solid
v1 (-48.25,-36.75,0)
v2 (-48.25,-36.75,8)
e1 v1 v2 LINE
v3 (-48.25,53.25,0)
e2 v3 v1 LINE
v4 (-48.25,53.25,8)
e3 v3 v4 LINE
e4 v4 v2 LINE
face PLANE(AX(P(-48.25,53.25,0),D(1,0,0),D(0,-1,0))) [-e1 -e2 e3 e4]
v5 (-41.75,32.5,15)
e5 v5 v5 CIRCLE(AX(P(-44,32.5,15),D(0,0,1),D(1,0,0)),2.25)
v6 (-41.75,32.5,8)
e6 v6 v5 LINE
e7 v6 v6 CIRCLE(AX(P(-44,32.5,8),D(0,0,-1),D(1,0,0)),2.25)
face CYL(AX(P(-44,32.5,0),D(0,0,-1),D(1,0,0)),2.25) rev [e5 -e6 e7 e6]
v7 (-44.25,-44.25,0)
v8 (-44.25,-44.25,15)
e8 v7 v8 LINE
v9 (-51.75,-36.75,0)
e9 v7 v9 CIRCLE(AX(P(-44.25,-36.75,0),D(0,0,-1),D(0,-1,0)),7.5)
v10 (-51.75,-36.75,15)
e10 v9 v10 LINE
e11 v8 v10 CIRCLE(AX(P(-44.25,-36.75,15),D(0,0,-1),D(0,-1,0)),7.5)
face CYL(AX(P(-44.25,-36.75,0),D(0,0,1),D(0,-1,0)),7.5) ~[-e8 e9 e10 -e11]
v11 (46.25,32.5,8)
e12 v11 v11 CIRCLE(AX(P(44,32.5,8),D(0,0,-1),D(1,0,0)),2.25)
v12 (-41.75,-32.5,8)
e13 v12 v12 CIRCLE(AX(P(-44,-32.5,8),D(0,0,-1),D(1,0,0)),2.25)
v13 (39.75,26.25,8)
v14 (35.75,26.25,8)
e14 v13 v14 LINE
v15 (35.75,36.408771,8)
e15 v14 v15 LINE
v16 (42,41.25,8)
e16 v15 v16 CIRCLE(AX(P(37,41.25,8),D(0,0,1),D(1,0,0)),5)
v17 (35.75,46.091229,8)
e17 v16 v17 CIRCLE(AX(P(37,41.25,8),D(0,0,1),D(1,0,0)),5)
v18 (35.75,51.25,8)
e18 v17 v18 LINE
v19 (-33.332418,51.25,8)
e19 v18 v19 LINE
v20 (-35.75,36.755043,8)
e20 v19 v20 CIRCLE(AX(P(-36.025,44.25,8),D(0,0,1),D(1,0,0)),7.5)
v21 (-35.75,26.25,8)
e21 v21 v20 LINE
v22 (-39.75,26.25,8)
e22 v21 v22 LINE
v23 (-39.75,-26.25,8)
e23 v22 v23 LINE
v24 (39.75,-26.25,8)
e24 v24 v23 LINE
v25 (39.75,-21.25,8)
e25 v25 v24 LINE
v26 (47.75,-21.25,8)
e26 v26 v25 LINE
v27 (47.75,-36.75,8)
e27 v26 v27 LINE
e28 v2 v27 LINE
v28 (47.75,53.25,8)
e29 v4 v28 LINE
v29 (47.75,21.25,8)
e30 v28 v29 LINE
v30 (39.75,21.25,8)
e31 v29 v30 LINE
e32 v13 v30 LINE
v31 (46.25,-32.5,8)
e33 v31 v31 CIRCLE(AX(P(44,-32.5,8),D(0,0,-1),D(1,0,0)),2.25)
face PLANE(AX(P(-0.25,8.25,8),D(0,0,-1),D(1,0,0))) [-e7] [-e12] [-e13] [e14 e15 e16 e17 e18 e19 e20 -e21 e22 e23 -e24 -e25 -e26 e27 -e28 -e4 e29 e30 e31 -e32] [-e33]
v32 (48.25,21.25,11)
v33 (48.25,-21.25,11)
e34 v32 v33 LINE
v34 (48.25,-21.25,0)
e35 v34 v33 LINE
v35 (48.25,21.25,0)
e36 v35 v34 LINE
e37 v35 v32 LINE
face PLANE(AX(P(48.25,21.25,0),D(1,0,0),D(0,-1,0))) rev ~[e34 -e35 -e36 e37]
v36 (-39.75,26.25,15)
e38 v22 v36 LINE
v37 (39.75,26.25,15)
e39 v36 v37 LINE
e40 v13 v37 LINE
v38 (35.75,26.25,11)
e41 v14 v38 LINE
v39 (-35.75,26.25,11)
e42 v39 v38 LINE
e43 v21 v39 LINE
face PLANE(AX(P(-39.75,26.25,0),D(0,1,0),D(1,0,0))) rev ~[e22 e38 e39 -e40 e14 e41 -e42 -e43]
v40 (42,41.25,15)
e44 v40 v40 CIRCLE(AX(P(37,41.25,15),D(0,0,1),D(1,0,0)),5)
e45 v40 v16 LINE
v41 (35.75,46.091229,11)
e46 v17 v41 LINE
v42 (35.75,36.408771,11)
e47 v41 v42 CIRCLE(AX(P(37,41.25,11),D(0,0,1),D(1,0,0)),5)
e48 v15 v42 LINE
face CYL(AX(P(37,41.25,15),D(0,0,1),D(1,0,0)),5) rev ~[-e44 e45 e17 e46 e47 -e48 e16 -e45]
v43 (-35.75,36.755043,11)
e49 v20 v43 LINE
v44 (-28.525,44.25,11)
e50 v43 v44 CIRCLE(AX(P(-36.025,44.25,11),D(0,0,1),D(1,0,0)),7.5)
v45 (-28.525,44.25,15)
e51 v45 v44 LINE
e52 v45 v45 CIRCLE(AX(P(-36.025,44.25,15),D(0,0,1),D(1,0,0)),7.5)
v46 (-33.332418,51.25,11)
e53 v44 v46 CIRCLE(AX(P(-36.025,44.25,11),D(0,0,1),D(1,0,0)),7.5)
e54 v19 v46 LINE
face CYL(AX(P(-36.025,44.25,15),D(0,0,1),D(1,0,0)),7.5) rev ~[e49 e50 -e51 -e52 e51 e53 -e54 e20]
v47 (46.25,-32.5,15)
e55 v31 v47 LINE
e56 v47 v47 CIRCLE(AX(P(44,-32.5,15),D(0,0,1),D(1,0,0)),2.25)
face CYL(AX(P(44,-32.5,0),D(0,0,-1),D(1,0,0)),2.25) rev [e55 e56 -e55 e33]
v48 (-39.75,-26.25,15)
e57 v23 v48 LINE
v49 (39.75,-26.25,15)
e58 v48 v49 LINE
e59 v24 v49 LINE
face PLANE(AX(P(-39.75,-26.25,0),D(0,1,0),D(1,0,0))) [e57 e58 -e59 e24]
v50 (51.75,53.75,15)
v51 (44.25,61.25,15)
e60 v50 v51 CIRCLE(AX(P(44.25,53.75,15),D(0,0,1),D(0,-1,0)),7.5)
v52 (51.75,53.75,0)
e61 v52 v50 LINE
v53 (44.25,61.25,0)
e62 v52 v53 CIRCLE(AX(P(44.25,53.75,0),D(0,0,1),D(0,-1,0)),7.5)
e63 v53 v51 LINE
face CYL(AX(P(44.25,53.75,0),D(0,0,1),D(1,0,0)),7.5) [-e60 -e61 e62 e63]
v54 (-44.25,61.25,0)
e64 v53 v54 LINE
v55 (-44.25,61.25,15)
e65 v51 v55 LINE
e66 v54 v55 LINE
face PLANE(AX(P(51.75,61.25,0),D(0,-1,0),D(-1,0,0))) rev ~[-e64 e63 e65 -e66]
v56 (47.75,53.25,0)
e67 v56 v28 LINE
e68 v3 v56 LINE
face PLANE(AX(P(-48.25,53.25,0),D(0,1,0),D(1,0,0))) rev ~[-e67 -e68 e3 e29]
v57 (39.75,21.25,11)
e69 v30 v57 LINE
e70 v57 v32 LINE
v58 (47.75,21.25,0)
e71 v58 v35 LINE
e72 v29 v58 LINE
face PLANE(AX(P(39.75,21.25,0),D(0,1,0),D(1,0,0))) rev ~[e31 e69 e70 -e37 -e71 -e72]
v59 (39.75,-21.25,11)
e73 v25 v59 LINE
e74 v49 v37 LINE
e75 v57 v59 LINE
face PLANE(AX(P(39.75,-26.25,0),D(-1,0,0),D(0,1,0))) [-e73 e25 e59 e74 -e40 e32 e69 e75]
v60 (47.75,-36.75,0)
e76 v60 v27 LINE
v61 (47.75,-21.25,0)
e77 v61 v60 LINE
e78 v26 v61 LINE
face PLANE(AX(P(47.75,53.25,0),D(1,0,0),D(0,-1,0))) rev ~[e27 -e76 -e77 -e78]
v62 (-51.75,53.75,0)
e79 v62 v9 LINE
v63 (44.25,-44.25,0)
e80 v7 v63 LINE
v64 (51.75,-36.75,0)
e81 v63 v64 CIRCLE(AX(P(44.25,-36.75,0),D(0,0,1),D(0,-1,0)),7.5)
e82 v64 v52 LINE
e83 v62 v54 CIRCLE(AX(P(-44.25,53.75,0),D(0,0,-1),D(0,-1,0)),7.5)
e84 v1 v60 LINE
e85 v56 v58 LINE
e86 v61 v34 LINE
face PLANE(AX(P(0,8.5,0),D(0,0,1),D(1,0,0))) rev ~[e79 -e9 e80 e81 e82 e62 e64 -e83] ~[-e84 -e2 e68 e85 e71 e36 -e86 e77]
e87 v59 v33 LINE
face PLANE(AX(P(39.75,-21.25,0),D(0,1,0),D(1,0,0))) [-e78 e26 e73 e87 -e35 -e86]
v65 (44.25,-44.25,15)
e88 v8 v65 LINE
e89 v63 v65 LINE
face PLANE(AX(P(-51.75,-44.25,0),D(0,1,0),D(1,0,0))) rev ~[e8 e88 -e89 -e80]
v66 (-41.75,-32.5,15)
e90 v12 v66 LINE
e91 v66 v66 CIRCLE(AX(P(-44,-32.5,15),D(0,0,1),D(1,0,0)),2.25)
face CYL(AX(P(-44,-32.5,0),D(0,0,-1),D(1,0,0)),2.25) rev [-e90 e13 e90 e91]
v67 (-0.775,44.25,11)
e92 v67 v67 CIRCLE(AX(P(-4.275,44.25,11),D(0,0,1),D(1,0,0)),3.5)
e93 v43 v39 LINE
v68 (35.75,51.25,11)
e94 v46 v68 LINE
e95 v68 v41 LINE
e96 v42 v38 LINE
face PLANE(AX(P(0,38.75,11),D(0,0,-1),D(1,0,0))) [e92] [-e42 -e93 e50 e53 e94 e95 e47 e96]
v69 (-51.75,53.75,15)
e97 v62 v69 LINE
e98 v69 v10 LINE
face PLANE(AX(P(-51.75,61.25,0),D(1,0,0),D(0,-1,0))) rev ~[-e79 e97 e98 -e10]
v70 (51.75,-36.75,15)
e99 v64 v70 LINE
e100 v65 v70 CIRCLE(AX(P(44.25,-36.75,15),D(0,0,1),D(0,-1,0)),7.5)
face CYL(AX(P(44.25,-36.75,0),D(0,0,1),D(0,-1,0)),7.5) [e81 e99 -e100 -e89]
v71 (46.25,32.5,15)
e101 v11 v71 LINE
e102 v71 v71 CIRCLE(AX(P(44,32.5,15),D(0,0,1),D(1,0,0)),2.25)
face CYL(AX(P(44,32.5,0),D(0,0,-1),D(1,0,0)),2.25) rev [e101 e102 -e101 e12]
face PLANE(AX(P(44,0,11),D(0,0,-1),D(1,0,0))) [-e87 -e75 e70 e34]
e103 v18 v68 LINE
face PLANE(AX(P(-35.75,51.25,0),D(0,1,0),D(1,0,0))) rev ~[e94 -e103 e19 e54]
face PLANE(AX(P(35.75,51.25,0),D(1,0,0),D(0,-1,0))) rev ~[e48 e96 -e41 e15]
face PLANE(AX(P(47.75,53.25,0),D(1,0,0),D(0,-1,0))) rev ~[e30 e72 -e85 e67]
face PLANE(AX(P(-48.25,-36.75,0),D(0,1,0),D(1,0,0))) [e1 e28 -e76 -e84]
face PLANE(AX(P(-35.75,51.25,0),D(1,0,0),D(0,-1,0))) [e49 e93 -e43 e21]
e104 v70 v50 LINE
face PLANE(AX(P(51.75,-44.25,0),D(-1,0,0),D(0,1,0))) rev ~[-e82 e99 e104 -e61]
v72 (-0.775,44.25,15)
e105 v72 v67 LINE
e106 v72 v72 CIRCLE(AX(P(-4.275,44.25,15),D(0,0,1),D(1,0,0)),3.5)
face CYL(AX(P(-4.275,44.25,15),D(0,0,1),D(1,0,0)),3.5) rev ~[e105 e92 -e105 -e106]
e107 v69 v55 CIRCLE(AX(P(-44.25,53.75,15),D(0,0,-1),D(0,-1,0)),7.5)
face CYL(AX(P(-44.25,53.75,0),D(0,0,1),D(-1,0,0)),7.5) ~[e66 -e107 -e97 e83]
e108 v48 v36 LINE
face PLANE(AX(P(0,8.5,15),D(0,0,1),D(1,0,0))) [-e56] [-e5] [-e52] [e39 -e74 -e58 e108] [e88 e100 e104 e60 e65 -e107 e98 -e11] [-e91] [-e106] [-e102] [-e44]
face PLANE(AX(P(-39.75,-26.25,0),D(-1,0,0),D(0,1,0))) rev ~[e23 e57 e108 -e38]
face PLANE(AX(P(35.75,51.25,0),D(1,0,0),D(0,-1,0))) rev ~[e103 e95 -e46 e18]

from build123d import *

# Parameters (mm, degrees)
F0_R     = 2.25
F0_W     = 79.5
F0_H     = 52.5
F1_DEPTH = 15
F2_W     = 8.5
F2_H     = 42.5
F2_W_2   = 71.5
F2_H_2   = 25
F3_DEPTH = 11
F4_W     = 96
F4_H     = 90
F5_DEPTH = 8
F6_R     = 7.5
F6_R_2   = 3.5
F6_R_3   = 5
F7_DEPTH = 15.001
F8_R     = 7.5


with BuildPart() as f1:
    # F0 (on Top) → F1 (new body)
    with BuildSketch(Plane.XY):
        Polygon((-51.75, -9.25), (-51.75, -44.25), (51.75, -44.25), (51.75, 61.25), (11.75, 61.25), (-3.25, 61.25), (-51.75, 61.25), align=None)
        with Locations((-44, -32.5)):
            Circle(F0_R, mode=Mode.SUBTRACT)
        with Locations((44, -32.5)):
            Circle(F0_R, mode=Mode.SUBTRACT)
        Rectangle(F0_W, F0_H, mode=Mode.SUBTRACT)
        with Locations((-44, 32.5)):
            Circle(F0_R, mode=Mode.SUBTRACT)
        with Locations((44, 32.5)):
            Circle(F0_R, mode=Mode.SUBTRACT)
    extrude(amount=F1_DEPTH)

    # F2 (on face) → F3 (cut)
    with BuildSketch(Plane(origin=(0, 0, 0), x_dir=(1, 0, 0), z_dir=(0, 0, -1))):
        with Locations((44, 0)):
            Rectangle(F2_W, F2_H)
        with Locations((0, -38.75)):
            Rectangle(F2_W_2, F2_H_2)
    extrude(amount=-F3_DEPTH, mode=Mode.SUBTRACT)

    # F4 (on face) → F5 (cut)
    with BuildSketch(Plane(origin=(0, 0, 0), x_dir=(1, 0, 0), z_dir=(0, 0, -1))):
        with Locations((-0.25, -8.25)):
            Rectangle(F4_W, F4_H)
    extrude(amount=-F5_DEPTH, mode=Mode.SUBTRACT)

    # F6 (on face) → F7 (cut, through all)
    with BuildSketch(Plane.XY.offset(15)):
        with Locations((-36.025, 44.25)):
            Circle(F6_R)
        with Locations((-4.275, 44.25)):
            Circle(F6_R_2)
        with Locations((37, 41.25)):
            Circle(F6_R_3)
    extrude(amount=-F7_DEPTH, mode=Mode.SUBTRACT)

    # F8
    f8_edges = [f1.edges().sort_by_distance(p)[0] for p in [
        (51.75, -44.25, 7.5),
        (-51.75, 61.25, 7.5),
        (-51.75, -44.25, 7.5),
        (51.75, 61.25, 7.5),
    ]]
    fillet(f8_edges, radius=F8_R)


solid = f1.part
